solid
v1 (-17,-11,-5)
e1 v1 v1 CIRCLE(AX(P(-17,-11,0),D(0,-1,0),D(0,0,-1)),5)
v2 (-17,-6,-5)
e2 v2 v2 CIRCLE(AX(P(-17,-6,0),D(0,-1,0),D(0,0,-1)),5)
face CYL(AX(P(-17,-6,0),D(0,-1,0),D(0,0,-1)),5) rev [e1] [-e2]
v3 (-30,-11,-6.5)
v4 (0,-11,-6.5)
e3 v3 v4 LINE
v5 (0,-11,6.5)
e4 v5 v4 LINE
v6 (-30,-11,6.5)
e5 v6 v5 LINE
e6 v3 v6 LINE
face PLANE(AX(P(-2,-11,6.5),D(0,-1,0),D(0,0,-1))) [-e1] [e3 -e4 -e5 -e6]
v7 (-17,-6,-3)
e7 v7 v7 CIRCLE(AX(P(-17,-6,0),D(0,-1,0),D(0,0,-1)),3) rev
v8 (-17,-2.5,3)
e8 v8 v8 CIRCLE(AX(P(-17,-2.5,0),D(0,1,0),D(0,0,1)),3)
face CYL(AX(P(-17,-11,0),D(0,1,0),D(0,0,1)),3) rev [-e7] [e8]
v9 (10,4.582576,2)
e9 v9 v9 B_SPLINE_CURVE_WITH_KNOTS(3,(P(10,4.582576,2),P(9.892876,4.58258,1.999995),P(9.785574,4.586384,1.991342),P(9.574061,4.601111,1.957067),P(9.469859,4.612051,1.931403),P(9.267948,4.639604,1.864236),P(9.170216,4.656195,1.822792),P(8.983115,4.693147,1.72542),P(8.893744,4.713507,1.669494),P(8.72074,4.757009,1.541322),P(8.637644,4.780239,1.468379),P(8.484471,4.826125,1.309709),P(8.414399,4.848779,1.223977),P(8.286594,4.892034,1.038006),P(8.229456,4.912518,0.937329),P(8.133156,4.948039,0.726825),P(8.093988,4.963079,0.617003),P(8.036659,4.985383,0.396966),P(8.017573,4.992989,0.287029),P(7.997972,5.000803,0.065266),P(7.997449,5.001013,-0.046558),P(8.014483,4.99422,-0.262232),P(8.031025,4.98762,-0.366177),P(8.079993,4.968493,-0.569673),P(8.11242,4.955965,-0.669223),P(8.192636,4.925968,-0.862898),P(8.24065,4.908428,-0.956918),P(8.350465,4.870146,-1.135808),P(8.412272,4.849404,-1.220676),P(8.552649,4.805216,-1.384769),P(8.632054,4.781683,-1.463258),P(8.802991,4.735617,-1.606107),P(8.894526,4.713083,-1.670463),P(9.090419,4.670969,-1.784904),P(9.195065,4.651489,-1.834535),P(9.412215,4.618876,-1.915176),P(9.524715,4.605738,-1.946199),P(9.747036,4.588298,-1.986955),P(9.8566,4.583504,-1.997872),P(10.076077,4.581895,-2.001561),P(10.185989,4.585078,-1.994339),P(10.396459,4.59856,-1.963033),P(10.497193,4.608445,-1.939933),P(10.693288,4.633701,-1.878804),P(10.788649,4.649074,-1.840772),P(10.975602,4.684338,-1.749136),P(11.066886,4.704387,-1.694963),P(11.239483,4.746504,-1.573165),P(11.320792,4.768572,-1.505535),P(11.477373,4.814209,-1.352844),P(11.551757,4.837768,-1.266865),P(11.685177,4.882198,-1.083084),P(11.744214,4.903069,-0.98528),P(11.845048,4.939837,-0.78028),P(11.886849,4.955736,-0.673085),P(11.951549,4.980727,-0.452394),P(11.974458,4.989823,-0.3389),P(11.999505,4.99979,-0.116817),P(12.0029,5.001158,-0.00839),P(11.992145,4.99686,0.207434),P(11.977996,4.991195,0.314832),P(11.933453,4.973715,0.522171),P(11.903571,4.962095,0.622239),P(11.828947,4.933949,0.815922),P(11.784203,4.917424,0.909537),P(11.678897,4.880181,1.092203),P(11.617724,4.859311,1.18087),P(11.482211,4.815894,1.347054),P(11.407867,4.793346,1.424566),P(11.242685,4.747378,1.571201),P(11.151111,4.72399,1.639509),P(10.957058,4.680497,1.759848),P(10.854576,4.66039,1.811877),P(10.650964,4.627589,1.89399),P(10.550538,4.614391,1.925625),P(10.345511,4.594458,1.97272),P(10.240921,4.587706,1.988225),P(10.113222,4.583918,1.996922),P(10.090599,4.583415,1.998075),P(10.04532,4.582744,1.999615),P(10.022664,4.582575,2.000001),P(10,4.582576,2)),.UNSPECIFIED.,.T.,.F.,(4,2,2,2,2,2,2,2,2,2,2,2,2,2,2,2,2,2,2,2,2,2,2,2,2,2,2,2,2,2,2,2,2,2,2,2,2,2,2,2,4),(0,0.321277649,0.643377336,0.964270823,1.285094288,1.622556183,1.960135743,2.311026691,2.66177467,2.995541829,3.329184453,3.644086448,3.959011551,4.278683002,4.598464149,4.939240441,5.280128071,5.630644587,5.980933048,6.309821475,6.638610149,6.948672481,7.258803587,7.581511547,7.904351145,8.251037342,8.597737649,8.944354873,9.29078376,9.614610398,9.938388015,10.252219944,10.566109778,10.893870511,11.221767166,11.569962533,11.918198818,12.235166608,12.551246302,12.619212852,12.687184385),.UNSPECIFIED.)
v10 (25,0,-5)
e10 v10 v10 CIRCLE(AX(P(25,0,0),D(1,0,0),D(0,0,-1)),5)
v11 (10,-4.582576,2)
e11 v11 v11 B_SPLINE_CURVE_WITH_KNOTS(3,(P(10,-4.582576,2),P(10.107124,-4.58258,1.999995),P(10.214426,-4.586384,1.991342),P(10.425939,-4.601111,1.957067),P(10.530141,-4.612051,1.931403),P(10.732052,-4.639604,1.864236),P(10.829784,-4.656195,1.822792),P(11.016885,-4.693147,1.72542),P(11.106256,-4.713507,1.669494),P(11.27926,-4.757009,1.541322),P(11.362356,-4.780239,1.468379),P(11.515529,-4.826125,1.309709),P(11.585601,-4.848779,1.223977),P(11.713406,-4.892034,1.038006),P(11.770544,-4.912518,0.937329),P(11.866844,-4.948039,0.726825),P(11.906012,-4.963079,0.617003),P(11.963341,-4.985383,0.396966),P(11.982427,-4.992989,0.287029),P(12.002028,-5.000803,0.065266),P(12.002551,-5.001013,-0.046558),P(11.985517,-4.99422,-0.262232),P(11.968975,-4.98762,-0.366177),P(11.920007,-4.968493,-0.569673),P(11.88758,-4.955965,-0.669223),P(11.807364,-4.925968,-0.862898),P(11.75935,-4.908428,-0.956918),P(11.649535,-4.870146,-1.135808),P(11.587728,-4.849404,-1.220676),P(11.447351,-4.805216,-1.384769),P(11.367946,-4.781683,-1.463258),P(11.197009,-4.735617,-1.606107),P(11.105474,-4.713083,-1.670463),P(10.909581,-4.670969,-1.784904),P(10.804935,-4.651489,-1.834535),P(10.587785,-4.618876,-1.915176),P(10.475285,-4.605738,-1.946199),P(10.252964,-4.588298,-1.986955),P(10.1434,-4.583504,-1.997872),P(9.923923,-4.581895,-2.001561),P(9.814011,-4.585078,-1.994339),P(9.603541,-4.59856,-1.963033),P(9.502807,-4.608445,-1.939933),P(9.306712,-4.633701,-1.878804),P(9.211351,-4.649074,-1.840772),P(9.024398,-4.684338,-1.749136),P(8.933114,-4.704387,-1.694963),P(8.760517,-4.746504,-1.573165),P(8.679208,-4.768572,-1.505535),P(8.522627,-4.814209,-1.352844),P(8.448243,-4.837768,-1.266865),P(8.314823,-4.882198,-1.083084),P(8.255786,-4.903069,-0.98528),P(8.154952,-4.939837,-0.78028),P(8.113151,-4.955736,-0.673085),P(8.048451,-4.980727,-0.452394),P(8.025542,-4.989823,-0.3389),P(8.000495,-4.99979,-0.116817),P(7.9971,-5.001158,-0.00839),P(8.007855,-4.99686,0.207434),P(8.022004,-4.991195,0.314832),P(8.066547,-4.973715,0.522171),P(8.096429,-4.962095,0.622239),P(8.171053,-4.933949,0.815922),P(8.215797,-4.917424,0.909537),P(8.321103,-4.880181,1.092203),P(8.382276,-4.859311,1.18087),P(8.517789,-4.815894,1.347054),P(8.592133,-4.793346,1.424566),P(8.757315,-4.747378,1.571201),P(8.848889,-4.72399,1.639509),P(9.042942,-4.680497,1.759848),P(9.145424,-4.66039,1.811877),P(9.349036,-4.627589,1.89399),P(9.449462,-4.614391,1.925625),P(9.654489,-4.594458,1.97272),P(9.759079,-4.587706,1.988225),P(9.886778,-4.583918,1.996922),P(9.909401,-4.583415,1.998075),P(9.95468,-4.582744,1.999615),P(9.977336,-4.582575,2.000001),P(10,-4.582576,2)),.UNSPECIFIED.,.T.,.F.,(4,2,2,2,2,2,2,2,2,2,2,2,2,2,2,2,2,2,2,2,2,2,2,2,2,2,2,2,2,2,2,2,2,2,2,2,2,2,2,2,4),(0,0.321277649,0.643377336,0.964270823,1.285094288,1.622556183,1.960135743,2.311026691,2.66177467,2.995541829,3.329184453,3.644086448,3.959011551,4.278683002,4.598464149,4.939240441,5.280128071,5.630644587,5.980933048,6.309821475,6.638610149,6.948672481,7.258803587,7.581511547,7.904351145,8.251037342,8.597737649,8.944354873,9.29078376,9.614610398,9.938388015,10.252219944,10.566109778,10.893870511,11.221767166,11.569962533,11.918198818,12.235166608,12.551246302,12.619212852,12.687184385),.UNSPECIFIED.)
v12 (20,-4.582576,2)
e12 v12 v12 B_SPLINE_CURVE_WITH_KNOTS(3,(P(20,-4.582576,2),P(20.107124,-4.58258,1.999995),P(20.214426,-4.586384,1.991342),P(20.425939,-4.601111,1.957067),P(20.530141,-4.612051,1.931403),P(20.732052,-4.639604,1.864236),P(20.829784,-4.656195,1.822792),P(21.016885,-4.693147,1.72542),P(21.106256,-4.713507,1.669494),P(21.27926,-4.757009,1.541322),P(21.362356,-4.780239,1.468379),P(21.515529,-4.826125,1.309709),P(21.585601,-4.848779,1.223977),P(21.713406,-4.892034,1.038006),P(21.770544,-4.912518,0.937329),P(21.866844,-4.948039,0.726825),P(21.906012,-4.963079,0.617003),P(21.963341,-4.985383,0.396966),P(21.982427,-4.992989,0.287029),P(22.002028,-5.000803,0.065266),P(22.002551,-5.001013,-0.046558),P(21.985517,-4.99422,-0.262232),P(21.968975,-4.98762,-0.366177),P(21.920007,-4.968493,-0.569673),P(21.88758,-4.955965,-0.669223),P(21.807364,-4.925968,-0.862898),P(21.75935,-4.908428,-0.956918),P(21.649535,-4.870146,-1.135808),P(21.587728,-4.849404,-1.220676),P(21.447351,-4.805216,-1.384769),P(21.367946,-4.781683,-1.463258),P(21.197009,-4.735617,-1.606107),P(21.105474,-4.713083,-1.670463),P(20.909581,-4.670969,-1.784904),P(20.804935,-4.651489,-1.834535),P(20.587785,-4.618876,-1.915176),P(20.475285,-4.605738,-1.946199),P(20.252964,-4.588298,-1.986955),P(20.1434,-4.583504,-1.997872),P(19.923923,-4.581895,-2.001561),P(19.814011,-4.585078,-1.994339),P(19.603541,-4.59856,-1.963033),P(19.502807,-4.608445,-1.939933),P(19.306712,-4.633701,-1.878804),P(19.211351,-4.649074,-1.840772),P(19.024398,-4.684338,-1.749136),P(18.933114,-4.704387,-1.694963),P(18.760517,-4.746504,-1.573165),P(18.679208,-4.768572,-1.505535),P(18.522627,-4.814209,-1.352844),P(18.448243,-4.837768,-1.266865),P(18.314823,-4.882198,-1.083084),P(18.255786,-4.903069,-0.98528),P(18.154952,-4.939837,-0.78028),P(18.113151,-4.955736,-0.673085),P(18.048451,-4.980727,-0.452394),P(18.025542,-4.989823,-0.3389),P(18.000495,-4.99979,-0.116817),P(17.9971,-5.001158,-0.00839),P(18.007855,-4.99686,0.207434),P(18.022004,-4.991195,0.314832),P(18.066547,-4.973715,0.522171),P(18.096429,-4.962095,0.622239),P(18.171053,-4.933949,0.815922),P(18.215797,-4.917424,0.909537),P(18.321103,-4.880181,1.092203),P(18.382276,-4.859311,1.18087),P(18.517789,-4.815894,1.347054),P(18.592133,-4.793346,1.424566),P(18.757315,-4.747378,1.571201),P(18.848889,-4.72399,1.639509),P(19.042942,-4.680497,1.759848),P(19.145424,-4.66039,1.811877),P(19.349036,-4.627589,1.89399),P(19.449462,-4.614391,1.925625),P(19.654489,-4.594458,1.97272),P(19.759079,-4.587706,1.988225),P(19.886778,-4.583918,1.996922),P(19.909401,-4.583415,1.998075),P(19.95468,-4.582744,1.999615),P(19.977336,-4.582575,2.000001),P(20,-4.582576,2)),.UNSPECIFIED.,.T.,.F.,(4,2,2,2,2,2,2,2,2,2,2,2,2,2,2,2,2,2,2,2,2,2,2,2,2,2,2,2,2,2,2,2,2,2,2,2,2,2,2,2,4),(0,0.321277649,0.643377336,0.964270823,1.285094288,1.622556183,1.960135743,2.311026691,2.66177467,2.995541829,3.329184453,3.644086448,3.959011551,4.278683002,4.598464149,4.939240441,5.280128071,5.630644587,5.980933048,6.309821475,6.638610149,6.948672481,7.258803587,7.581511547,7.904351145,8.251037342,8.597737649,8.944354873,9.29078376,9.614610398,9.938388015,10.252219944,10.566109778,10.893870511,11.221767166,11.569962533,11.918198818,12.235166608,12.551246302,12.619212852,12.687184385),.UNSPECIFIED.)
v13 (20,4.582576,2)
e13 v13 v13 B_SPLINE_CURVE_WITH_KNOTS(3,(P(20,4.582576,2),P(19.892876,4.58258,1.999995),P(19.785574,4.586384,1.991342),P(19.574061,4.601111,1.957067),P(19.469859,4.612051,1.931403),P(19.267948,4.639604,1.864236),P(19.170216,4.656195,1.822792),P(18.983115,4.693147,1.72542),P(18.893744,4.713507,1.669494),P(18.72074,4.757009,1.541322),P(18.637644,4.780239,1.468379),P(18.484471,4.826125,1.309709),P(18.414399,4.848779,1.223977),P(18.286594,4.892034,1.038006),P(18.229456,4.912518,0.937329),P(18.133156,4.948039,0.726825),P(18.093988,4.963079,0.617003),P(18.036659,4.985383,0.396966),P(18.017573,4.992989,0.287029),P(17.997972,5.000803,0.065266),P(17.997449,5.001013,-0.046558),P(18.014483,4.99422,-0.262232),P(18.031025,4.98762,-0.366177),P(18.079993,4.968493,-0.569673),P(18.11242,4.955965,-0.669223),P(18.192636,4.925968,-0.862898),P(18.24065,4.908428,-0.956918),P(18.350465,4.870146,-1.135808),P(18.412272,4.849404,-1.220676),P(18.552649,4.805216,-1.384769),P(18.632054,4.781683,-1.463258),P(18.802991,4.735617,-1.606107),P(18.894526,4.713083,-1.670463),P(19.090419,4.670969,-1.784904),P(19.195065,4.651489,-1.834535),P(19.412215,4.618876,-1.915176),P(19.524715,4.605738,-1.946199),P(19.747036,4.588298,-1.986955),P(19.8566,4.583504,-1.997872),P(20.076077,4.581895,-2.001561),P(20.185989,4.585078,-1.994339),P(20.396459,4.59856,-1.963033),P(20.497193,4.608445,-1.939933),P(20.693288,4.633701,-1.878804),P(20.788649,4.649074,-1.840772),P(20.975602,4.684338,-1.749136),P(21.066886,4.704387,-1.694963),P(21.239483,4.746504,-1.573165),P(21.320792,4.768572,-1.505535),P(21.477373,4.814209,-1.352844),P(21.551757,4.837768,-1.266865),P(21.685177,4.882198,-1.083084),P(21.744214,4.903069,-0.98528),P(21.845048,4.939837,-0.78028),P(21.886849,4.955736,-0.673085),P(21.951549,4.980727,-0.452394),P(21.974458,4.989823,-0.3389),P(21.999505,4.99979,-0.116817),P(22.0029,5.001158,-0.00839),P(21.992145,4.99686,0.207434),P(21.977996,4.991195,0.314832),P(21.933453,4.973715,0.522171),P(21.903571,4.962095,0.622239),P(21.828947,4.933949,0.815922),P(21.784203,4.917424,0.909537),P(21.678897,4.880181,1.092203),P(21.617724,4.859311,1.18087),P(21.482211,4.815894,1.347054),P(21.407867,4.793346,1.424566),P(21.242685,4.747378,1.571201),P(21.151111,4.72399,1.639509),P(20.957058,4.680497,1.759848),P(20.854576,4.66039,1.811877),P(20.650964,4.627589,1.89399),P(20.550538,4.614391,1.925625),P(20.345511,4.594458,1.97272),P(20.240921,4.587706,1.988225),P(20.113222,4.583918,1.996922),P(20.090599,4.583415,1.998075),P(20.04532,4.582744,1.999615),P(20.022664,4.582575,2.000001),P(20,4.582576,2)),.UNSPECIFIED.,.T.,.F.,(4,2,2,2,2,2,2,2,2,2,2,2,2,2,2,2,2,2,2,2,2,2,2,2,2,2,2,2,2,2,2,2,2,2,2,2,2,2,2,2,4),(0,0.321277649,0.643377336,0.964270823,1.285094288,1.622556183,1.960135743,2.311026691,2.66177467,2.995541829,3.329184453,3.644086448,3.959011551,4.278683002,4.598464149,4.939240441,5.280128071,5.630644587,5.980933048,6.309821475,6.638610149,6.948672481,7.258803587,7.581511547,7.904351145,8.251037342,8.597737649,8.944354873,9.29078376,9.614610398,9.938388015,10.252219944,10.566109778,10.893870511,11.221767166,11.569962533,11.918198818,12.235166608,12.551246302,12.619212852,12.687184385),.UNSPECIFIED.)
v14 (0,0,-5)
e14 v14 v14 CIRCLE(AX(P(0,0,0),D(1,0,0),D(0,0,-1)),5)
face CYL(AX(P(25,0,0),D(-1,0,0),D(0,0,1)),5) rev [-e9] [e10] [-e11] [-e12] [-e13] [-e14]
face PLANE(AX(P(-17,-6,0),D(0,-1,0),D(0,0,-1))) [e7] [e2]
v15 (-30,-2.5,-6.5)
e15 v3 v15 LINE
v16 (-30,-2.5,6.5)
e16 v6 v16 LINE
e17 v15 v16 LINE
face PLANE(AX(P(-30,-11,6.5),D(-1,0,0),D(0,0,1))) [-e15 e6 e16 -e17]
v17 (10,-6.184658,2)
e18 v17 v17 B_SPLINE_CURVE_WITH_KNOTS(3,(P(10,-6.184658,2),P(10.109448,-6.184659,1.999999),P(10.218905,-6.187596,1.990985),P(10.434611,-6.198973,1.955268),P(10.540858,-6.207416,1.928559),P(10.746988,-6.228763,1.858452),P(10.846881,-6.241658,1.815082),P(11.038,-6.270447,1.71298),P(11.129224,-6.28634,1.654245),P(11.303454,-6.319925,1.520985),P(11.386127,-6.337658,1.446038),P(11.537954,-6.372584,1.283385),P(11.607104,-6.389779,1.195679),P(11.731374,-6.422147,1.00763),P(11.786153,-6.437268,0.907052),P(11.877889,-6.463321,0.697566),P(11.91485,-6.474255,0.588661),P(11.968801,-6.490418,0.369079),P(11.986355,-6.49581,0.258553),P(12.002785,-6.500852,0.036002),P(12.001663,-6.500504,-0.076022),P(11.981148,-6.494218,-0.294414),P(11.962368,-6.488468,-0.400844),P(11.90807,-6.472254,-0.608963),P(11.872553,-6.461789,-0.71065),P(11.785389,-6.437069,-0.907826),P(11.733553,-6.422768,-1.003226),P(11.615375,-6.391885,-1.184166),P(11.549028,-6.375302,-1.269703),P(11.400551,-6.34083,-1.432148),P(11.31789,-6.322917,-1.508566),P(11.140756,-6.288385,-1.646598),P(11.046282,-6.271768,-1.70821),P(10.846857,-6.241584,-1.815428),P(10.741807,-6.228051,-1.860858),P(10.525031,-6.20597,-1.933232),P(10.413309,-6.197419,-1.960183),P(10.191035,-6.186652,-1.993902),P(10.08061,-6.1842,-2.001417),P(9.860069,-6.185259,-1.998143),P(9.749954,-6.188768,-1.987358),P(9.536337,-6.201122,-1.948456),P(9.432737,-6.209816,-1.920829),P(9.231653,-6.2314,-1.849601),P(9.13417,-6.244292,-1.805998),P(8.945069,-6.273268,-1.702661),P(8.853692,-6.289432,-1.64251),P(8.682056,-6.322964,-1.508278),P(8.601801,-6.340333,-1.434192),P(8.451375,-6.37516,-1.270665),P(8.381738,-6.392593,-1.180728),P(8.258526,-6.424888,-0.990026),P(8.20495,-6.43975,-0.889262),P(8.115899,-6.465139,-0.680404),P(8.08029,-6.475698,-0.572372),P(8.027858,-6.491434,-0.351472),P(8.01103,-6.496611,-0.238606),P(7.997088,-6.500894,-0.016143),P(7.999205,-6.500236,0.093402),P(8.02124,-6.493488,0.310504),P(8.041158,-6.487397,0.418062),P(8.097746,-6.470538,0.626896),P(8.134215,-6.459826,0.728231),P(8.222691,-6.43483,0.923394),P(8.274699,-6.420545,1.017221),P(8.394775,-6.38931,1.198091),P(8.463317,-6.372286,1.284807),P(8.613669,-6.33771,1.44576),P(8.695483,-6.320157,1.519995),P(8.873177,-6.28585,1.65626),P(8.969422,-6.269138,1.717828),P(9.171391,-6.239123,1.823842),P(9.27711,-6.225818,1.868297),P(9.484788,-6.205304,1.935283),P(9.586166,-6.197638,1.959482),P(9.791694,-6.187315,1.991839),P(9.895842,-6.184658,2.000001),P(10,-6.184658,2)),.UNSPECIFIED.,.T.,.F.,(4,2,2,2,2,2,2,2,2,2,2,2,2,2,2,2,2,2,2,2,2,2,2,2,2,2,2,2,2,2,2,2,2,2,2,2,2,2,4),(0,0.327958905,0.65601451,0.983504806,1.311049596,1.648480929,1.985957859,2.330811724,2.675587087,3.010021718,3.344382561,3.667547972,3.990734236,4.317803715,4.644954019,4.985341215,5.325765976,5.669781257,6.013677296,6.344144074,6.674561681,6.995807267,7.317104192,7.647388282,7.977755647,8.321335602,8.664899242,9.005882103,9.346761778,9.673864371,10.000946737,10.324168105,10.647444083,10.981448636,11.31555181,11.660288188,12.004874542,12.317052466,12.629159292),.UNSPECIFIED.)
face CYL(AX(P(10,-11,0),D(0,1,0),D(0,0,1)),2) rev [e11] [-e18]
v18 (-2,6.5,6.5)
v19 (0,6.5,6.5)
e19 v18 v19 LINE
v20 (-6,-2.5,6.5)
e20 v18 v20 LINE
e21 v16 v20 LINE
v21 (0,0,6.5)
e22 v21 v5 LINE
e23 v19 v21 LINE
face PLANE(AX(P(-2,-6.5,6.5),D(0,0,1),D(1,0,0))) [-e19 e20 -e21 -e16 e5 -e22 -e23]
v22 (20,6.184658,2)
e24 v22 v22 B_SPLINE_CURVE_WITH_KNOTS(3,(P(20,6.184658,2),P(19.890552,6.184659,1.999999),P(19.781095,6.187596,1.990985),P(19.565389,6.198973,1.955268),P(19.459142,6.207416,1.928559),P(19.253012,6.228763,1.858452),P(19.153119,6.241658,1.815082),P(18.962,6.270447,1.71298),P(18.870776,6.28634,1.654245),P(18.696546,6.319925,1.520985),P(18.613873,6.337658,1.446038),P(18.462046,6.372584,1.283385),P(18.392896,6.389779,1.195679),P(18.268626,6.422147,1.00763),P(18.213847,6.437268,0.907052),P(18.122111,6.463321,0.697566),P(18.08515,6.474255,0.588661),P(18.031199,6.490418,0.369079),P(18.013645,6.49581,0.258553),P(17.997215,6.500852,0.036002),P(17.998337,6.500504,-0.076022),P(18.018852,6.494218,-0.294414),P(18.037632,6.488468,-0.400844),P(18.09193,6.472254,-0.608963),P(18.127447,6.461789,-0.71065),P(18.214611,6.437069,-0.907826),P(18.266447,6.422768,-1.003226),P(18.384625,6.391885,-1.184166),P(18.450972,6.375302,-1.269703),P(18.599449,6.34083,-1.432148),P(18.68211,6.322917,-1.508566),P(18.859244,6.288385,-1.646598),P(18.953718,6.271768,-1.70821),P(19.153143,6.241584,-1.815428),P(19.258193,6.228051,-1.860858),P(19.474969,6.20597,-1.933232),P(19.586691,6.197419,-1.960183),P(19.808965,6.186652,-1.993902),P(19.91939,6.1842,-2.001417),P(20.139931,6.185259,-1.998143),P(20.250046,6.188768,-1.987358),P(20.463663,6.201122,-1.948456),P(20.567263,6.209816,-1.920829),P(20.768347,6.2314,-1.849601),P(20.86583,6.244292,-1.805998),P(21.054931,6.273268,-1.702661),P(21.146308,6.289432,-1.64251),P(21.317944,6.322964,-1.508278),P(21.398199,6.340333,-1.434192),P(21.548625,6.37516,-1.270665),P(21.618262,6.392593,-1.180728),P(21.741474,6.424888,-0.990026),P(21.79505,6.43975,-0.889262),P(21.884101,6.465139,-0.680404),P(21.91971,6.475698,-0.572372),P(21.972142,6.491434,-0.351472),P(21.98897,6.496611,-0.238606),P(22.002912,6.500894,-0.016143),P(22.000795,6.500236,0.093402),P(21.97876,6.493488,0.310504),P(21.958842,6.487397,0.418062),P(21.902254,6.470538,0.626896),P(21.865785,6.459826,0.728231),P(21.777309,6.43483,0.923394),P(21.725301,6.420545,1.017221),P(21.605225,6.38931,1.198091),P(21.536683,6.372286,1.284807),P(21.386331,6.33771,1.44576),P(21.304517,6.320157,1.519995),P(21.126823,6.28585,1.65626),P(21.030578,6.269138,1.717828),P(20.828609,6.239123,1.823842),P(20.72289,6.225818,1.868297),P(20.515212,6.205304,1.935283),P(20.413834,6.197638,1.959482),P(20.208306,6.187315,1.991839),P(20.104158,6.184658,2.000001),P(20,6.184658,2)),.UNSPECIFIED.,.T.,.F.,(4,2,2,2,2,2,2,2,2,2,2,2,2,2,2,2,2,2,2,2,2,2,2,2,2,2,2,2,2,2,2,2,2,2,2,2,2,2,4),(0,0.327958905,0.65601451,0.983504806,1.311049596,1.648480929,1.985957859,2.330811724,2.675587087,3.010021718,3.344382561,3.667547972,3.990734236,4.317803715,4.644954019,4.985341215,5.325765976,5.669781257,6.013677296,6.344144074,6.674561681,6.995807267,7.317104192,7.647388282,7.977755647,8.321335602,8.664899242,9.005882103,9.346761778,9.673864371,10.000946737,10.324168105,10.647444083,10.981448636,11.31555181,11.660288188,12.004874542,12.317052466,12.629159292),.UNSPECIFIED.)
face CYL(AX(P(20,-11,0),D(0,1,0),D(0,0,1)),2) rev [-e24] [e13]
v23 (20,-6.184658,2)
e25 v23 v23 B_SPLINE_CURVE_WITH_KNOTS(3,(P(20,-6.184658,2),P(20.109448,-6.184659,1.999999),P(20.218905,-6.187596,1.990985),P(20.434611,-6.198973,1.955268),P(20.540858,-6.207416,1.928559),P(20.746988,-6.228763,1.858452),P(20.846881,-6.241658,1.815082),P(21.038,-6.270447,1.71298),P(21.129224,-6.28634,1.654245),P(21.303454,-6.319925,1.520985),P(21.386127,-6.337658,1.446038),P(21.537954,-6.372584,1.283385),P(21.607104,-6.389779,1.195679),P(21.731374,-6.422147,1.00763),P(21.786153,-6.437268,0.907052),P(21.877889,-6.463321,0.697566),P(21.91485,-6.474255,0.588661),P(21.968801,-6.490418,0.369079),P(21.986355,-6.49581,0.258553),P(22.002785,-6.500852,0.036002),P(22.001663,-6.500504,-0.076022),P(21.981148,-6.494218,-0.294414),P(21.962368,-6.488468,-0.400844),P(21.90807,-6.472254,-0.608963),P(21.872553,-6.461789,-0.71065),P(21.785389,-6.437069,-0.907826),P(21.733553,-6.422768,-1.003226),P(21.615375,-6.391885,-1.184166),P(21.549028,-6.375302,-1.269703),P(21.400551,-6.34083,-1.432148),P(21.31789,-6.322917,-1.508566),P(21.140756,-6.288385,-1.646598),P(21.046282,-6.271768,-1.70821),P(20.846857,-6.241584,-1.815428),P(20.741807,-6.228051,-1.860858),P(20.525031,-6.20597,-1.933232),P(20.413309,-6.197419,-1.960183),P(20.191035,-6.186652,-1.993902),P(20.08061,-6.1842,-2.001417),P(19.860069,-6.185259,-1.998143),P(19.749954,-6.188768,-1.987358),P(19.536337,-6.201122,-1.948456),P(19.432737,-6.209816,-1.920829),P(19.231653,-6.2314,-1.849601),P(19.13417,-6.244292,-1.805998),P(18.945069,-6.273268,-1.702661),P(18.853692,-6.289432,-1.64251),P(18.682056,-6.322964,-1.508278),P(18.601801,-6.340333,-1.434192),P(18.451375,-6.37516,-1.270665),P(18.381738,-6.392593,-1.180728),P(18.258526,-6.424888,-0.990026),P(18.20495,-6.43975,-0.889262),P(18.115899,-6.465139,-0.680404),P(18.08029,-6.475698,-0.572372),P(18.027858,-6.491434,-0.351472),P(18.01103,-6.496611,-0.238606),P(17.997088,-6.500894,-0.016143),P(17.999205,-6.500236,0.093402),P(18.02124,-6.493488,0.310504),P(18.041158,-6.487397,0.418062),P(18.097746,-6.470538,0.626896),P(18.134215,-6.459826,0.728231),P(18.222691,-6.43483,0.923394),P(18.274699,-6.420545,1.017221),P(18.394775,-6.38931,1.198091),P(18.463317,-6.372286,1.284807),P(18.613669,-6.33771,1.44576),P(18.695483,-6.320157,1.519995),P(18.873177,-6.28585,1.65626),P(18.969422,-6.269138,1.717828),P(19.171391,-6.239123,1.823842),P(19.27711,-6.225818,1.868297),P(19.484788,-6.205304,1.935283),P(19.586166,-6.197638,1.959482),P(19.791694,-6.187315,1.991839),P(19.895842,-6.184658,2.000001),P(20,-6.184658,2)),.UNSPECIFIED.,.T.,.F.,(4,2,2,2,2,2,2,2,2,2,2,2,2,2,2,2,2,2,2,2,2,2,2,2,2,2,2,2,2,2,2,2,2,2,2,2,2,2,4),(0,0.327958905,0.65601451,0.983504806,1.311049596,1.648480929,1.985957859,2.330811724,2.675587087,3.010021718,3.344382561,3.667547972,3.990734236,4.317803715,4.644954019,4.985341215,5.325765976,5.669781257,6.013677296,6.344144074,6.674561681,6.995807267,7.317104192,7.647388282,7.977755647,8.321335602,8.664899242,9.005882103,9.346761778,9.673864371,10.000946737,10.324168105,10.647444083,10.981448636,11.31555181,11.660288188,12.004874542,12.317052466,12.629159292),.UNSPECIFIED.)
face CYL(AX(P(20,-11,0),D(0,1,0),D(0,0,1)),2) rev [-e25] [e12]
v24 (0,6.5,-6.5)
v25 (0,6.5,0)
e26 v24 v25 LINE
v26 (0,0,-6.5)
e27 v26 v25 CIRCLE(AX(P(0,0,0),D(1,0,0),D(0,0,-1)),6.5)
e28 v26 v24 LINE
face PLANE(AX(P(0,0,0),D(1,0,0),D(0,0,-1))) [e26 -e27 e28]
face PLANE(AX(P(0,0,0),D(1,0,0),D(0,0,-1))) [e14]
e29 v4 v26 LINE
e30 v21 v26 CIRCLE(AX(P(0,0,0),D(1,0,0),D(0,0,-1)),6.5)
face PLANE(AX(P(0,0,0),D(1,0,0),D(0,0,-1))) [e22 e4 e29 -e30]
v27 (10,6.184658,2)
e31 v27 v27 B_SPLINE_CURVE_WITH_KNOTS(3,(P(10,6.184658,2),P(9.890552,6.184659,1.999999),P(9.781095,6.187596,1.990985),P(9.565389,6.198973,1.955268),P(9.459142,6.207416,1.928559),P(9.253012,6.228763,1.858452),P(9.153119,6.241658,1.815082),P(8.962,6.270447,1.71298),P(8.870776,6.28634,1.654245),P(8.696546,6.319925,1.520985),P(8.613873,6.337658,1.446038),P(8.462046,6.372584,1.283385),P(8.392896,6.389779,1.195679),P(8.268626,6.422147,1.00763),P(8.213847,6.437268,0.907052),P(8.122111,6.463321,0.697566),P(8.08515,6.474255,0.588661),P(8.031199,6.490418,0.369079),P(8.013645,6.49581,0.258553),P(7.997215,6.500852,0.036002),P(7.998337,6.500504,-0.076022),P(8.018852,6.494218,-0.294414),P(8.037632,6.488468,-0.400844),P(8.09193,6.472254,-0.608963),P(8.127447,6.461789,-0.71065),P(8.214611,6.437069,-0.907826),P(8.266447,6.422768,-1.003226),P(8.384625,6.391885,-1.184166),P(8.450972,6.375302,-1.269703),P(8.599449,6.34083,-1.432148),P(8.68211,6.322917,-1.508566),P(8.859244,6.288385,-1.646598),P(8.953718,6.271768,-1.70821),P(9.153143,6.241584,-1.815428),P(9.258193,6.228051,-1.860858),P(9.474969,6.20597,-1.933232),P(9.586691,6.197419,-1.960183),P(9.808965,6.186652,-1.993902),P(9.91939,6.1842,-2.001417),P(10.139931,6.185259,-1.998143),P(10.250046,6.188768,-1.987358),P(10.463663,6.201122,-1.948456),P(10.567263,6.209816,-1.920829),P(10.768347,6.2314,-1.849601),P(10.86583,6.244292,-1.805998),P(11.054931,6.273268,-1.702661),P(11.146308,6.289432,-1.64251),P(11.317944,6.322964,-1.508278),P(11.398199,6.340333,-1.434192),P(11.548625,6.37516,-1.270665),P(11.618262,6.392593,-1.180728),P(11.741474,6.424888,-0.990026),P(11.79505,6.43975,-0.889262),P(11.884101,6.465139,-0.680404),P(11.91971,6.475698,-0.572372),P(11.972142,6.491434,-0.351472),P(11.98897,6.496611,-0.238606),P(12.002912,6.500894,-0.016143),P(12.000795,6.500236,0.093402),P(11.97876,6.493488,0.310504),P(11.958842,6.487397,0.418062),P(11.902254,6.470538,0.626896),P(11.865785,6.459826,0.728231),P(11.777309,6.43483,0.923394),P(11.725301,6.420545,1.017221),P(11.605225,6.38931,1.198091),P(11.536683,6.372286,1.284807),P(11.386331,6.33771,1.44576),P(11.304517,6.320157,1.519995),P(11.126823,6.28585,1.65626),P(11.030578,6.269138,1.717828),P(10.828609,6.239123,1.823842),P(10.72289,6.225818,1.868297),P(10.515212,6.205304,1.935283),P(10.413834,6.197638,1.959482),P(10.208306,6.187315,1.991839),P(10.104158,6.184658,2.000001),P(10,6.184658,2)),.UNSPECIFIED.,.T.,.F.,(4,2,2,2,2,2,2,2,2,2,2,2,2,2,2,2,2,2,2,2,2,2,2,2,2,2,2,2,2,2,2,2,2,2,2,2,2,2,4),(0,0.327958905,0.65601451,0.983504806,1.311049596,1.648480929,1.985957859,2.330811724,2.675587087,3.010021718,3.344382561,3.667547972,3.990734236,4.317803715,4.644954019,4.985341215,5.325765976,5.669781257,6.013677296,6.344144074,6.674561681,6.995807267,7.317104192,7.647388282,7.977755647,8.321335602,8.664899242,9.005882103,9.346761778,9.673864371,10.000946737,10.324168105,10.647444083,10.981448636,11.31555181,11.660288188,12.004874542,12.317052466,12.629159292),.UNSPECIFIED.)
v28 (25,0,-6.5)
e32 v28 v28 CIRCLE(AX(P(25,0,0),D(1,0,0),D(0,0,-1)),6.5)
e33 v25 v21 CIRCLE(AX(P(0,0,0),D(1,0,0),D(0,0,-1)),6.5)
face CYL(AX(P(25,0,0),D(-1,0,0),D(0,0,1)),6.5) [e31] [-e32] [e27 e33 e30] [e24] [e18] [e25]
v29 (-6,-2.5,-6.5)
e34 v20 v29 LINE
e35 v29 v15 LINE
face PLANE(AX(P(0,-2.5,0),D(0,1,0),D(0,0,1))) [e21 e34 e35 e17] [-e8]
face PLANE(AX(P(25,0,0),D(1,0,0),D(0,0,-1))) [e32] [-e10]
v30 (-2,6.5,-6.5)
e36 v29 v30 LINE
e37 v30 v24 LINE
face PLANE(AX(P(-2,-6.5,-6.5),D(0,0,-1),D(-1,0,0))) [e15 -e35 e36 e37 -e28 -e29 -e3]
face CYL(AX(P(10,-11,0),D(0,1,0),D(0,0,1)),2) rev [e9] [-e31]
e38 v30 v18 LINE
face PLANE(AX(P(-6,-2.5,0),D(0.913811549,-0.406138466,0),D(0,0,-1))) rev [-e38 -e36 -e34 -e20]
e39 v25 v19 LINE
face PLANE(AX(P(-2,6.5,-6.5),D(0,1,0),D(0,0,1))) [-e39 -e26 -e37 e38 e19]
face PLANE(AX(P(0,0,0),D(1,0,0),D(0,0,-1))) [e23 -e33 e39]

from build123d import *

# Parameters (mm, degrees)
SKETCH1_R               = 6.5
SKETCH1_R_2             = 5
BOSS_EXTRUDE1_DEPTH     = 25
BOSS_EXTRUDE2_DEPTH     = 2
CUT_EXTRUDE1_DEPTH      = 29.075790283
CUT_EXTRUDE1_DEPTH_BACK = 29.075790283
SKETCH4_R               = 2
SKETCH3_W               = 28
SKETCH3_H               = 13
SKETCH3_R               = 3
BOSS_EXTRUDE3_DEPTH     = 8.5
SKETCH5_R               = 5
CUT_EXTRUDE2_DEPTH      = 5
CHAMFER1_SIZE2          = 4
CHAMFER1_SIZE           = 9


with BuildPart() as part:
    # Sketch1 → Boss-Extrude1 (new body)
    with BuildSketch(Plane(origin=(0, 0, 0), x_dir=(0, 0, -1), z_dir=(1, 0, 0))):
        Circle(SKETCH1_R)
        Circle(SKETCH1_R_2, mode=Mode.SUBTRACT)
    extrude(amount=BOSS_EXTRUDE1_DEPTH)

    # Sketch2 → Boss-Extrude2 (add)
    with BuildSketch(Plane(origin=(0, 0, 0), x_dir=(0, 0, -1), z_dir=(1, 0, 0))):
        Polygon((-6.5, -6.5), (-6.5, -11), (6.5, -11), (6.5, -6.5), (6.5, 6.5), (-6.5, 6.5), align=None)
    extrude(amount=-BOSS_EXTRUDE2_DEPTH)

    # Sketch4 → Cut-Extrude1 (cut, two sides: drawn at the far end of the back side and taken through both)
    with BuildSketch(Plane(origin=(0, 0, 0), x_dir=(1, 0, 0), z_dir=(0, 1, 0)).offset(-CUT_EXTRUDE1_DEPTH_BACK)):
        with Locations(Location((10, 0, 0), (0, 0, 270))):
            Circle(SKETCH4_R)
        with Locations(Location((20, 0, 0), (0, 0, 270))):
            Circle(SKETCH4_R)
    extrude(amount=CUT_EXTRUDE1_DEPTH + CUT_EXTRUDE1_DEPTH_BACK, mode=Mode.SUBTRACT)

    # Sketch3 → Boss-Extrude3 (add)
    with BuildSketch(Plane(origin=(0, -2.5, 0), x_dir=(1, 0, 0), z_dir=(0, 1, 0))):
        with Locations((-16, 0)):
            Rectangle(SKETCH3_W, SKETCH3_H)
        with Locations(Location((-17, 0, 0), (0, 0, 270))):
            Circle(SKETCH3_R, mode=Mode.SUBTRACT)
    extrude(amount=-BOSS_EXTRUDE3_DEPTH)

    # Sketch5 → Cut-Extrude2 (cut)
    with BuildSketch(Plane.XZ.offset(11)):
        with Locations(Location((-17, 0, 0), (0, 0, 270))):
            Circle(SKETCH5_R)
    extrude(amount=-CUT_EXTRUDE2_DEPTH, mode=Mode.SUBTRACT)

    # Chamfer1
    chamfer1_edges = [part.edges().sort_by_distance(p)[0] for p in [
        (-2, -2.5, 0),
    ]]
    chamfer1_side = [part.faces().sort_by_distance(p)[0] for p in [
        (-2, -2.42, 0),
    ]]
    chamfer(chamfer1_edges, length=CHAMFER1_SIZE - 0.0001, length2=CHAMFER1_SIZE2 - 0.0001, reference=chamfer1_side[0])  # a hair under: the kernel refuses the full size


solid = part.part
